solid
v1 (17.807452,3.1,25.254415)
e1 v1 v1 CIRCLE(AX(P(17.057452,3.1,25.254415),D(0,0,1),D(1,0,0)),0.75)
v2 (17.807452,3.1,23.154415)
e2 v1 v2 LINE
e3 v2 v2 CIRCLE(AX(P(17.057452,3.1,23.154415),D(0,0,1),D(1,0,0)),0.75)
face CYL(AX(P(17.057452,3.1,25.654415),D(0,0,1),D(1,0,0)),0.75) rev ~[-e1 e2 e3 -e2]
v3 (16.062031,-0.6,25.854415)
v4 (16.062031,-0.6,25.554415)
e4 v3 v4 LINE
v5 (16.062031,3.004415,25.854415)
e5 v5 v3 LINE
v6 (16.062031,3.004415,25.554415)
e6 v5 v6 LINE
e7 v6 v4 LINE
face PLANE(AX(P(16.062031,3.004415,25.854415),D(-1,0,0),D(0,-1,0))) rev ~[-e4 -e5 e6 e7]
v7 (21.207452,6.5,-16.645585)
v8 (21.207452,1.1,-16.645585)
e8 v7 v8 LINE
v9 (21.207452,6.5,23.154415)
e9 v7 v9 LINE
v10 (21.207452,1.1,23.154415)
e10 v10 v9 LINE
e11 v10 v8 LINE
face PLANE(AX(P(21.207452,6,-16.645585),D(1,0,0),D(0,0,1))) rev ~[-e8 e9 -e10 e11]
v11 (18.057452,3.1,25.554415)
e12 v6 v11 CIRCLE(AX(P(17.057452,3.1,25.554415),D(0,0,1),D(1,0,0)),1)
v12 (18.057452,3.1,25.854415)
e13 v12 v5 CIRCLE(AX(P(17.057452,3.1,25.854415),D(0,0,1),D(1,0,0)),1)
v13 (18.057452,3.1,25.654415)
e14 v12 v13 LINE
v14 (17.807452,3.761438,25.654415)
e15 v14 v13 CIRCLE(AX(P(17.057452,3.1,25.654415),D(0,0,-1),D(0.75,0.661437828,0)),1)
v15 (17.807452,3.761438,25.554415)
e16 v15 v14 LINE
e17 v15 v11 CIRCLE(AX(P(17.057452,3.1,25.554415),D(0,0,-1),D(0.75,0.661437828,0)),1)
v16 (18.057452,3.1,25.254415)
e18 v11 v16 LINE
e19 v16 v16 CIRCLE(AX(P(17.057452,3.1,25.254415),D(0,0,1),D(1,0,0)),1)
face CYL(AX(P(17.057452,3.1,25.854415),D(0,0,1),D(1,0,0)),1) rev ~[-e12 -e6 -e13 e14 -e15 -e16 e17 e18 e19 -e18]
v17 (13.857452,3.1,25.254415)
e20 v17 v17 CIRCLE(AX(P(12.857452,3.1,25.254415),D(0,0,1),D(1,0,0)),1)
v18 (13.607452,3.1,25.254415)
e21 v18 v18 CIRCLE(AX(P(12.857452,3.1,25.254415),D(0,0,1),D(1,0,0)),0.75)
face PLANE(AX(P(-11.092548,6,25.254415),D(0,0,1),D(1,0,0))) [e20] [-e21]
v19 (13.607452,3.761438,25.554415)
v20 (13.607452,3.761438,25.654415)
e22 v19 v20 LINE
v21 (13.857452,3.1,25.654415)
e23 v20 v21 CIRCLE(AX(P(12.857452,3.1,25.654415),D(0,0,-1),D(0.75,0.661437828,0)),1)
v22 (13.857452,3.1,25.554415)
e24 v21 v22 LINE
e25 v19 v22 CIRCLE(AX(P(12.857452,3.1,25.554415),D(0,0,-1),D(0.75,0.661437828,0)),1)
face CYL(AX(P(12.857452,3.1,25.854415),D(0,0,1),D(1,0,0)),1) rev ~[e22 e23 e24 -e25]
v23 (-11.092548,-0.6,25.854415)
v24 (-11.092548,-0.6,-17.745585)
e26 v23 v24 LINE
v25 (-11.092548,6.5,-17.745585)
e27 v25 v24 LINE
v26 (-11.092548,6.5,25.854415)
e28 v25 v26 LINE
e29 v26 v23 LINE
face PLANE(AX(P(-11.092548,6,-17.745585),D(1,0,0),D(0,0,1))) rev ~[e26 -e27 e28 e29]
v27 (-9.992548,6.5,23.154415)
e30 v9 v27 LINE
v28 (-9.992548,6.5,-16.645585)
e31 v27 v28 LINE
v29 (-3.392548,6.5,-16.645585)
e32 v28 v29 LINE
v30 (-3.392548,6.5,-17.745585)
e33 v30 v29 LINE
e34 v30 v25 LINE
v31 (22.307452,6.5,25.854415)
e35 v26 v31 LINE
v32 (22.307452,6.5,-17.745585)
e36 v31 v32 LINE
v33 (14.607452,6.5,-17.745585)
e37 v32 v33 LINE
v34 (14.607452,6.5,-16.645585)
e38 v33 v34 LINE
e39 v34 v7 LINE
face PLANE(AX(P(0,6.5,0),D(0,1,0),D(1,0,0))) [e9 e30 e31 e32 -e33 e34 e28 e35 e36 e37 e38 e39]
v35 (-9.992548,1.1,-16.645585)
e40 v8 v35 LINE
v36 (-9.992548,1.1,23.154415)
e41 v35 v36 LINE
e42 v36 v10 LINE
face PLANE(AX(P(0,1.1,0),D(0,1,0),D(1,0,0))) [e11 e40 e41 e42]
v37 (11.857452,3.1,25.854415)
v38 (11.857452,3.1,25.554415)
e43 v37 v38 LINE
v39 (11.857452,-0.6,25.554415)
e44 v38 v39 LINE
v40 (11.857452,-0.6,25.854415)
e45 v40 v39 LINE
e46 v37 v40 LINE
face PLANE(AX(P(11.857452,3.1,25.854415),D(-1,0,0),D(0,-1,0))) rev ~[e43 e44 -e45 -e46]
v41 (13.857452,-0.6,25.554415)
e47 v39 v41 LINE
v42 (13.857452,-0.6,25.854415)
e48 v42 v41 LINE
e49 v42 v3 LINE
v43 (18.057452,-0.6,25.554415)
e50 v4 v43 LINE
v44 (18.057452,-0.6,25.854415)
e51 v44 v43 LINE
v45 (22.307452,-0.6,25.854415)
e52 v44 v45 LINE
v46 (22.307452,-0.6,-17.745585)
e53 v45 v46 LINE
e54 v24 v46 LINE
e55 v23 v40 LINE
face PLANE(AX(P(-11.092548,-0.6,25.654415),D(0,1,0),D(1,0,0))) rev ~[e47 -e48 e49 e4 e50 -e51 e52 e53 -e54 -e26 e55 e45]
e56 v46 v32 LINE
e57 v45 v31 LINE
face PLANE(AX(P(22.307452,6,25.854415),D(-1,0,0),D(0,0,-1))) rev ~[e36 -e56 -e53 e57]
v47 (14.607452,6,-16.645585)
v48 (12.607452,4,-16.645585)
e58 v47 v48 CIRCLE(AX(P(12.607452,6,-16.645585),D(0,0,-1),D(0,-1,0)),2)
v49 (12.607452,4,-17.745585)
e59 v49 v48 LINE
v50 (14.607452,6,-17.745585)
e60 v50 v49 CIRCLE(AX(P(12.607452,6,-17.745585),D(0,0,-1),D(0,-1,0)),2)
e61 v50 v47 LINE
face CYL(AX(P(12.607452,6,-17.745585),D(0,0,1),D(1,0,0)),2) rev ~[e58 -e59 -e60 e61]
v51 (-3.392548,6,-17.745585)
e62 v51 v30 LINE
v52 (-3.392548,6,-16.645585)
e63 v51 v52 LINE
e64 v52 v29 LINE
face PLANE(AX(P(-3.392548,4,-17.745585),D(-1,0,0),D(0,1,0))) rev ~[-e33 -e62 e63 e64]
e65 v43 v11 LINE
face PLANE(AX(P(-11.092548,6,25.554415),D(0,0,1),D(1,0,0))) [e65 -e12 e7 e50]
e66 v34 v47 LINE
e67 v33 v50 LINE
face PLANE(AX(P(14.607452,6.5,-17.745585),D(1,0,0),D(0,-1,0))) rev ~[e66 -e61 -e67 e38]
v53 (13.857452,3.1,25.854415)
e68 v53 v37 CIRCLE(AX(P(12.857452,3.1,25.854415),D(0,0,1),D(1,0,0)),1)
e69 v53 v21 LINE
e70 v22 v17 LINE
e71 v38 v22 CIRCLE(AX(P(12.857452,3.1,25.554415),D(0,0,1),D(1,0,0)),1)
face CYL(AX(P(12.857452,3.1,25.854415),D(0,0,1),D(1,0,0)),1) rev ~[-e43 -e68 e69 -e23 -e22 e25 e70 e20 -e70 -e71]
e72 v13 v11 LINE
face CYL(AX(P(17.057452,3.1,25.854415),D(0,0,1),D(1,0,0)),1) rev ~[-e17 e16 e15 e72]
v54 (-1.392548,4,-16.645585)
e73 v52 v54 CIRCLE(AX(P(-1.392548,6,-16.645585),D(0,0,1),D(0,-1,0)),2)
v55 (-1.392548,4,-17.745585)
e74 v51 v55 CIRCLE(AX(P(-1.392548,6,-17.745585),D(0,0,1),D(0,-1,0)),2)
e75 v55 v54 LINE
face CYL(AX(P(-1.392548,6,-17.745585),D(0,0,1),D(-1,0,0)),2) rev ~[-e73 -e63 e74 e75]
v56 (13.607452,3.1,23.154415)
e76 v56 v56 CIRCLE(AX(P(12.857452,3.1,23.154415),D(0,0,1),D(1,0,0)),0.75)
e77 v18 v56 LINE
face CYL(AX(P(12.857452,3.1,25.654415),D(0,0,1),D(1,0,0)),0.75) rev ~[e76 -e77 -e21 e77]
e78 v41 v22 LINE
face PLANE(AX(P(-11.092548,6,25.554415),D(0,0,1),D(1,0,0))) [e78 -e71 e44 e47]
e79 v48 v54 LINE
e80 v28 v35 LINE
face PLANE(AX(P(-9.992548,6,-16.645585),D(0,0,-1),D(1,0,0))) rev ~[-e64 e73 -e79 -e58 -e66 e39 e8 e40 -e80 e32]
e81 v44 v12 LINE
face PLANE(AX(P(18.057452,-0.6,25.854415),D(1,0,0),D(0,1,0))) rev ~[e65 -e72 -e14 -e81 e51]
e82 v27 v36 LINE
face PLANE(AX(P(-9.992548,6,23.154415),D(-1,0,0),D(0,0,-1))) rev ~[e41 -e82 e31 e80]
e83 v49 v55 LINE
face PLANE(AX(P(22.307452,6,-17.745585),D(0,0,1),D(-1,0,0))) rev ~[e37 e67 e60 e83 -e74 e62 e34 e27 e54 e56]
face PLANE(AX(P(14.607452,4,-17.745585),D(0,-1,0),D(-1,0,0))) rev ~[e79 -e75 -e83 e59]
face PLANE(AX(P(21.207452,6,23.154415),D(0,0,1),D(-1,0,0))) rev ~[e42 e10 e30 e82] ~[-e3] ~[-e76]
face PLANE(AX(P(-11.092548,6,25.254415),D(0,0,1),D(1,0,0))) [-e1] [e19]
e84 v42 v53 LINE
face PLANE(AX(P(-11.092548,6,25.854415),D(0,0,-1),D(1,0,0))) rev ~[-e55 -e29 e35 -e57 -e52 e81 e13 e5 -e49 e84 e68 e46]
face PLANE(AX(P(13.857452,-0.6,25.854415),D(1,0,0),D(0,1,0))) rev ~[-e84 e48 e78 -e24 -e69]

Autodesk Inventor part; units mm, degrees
ref_plane "YZ Plane" through (0, 0, 0) normal (1, 0, 0) x (0, 1, 0)
ref_plane "XZ Plane" through (0, 0, 0) normal (0, 1, 0) x (-1, 0, 0)
ref_plane "XY Plane" through (0, 0, 0) normal (0, 0, 1) x (1, 0, 0)
sketch "Sketch2" plane through (0, 0, 0) normal (0, 1, 0) x (-1, 0, 0)
  line L0 (11.092548, -17.745585) -> (-22.307452, -17.745585)
  line L1 (-22.307452, -17.745585) -> (-22.307452, 24.254415)
  line L2 (-22.307452, 24.254415) -> (11.092548, 24.254415)
  line L3 (11.092548, 24.254415) -> (11.092548, -17.745585)
  point P0 (0, 0)
  dimension "d2" = 42
  dimension "d3" = 33.4
sketch "Sketch2 outline for Extrusion1" plane through (0, 0, 0) normal (0, 1, 0) x (-1, 0, 0)
  line L0 (11.092548, -17.745585) -> (11.092548, 24.254415)
  line L1 (-22.307452, -17.745585) -> (11.092548, -17.745585)
  line L2 (-22.307452, 24.254415) -> (-22.307452, -17.745585)
  line L3 (11.092548, 24.254415) -> (-22.307452, 24.254415)
extrude "Extrusion1" add sketch "Sketch2 outline for Extrusion1" along normal blind 6
sketch "Sketch3" plane through (0, 6, 0) normal (0, 1, 0) x (1, 0, 0)
  line L0 (-9.992548, 16.645585) -> (21.207452, 16.645585)
  line L1 (21.207452, 16.645585) -> (21.207452, -23.154415)
  line L2 (21.207452, -23.154415) -> (-9.992548, -23.154415)
  line L3 (-9.992548, -23.154415) -> (-9.992548, 16.645585)
  line L4 (22.307452, 17.745585) -> (-11.092548, 17.745585)
  line L5 (-11.092548, 17.745585) -> (-11.092548, -24.254415)
  line L6 (22.307452, -24.254415) -> (22.307452, 17.745585)
  line L7 (-11.092548, -24.254415) -> (22.307452, -24.254415)
  point P0 (0, 0)
  dimension "d6" = 1.1
  dimension "d7" = 1.1
  dimension "d8" = 1.1
  dimension "d9" = 1.1
  dimension "d10" = 39.8
sketch "Sketch3 outline for Extrusion2" plane through (0, 6, 0) normal (0, 1, 0) x (1, 0, 0)
  line L0 (-9.992548, 16.645585) -> (-9.992548, -23.154415)
  line L1 (21.207452, 16.645585) -> (-9.992548, 16.645585)
  line L2 (21.207452, -23.154415) -> (21.207452, 16.645585)
  line L3 (-9.992548, -23.154415) -> (21.207452, -23.154415)
extrude "Extrusion2" cut sketch "Sketch3 outline for Extrusion2" against normal blind 4.9
sketch "Sketch4" plane through (0, 0, 0) normal (0, -1, 0) x (1, 0, 0)
  line L0 (22.307452, -17.745585) -> (-11.092548, -17.745585)
  line L1 (-11.092548, -17.745585) -> (-11.092548, 24.254415)
  line L2 (22.307452, -17.745585) -> (-11.092548, -17.745585)
  line L3 (-11.092548, -17.745585) -> (-11.092548, 24.254415)
  line L4 (-11.092548, 24.254415) -> (22.307452, 24.254415)
  line L5 (22.307452, 24.254415) -> (22.307452, -17.745585)
  point P0 (0, 0)
sketch "Sketch4 outline for Extrusion3" plane through (0, 0, 0) normal (0, -1, 0) x (1, 0, 0)
  line L0 (22.307452, -17.745585) -> (22.307452, 24.254415)
  line L1 (-11.092548, -17.745585) -> (22.307452, -17.745585)
  line L2 (-11.092548, 24.254415) -> (-11.092548, -17.745585)
  line L3 (22.307452, 24.254415) -> (-11.092548, 24.254415)
extrude "Extrusion3" add sketch "Sketch4 outline for Extrusion3" along normal blind 0.6
sketch "Sketch5" plane through (-11.092548, 6, 24.254415) normal (0, 0, 1) x (1, 0, 0)
  line L0 (33.4, -6.6) -> (33.4, 0) projected
  line L1 (33.4, -6.6) -> (0, -6.6)
  line L2 (0, -6.6) -> (0, -2.5)
  line L3 (0, -2.5) -> (33.4, -2.5)
  line L4 (33.4, -2.5) -> (33.4, -6.6)
  point P0 (11.092548, -6)
  point P1 (33.4, -2.5)
sketch "Sketch5 outline for Extrusion4" plane through (-11.092548, 6, 24.254415) normal (0, 0, 1) x (1, 0, 0)
  line L0 (33.4, -2.5) -> (0, -2.5)
  line L1 (33.4, -6.6) -> (33.4, -2.5)
  line L2 (0, -6.6) -> (33.4, -6.6)
  line L3 (0, -2.5) -> (0, -6.6)
extrude "Extrusion4" add sketch "Sketch5 outline for Extrusion4" along normal blind 3
sketch "Sketch6" plane through (21.207452, 6, 23.154415) normal (0, 0, -1) x (-1, 0, 0)
  line L0 (3.6, -0.9) -> (4.9, -0.9)
  line L1 (4.9, -0.9) -> (4.9, -3.9)
  line L2 (4.9, -3.9) -> (3.6, -3.9)
  line L3 (3.6, -3.9) -> (3.6, -0.9)
  line L4 (0, -4.9) -> (31.2, -4.9) projected
  line L5 (5.6, -0.9) -> (6.9, -0.9)
  line L6 (6.9, -0.9) -> (6.9, -3.9)
  line L7 (6.9, -3.9) -> (5.6, -3.9)
  line L8 (5.6, -3.9) -> (5.6, -0.9)
  line L9 (7.6, -0.9) -> (8.9, -0.9)
  line L10 (8.9, -0.9) -> (8.9, -3.9)
  line L11 (8.9, -3.9) -> (7.6, -3.9)
  line L12 (7.6, -3.9) -> (7.6, -0.9)
  point P0 (21.207452, -6)
  point P1 (0, 0)
  dimension "d17" = 3
  dimension "d18" = 1.3
  dimension "d19" = 3.6
  dimension "d20" = 1
  dimension "d23" = 3
  dimension "d24" = 1.3
  dimension "d25" = 3
  dimension "d26" = 1.3
  dimension "d27" = 1
  dimension "d28" = 1
  dimension "d29" = 0.7
  dimension "d30" = 0.7
sketch "Sketch7" plane through (-11.092548, 3.5, 24.254415) normal (0, 1, 0) x (1, 0, 0)
  line L0 (0, 0) -> (33.4, 0) projected
  line L1 (0, 42) -> (0, -3) projected
  line L2 (33.4, 0) -> (0, 0)
  line L3 (0, 0) -> (0, -3)
  line L4 (0, -3) -> (33.4, -3)
  line L5 (33.4, -3) -> (33.4, 0)
  point P0 (11.092548, 24.254415)
sketch "Sketch7 outline for Extrusion5" plane through (-11.092548, 3.5, 24.254415) normal (0, 1, 0) x (1, 0, 0)
  line L0 (33.4, -3) -> (33.4, 0)
  line L1 (0, -3) -> (33.4, -3)
  line L2 (0, 0) -> (0, -3)
  line L3 (33.4, 0) -> (0, 0)
extrude "Extrusion5" add sketch "Sketch7 outline for Extrusion5" along normal blind 2.5
sketch "Sketch6 outline for Extrusion6" plane through (21.207452, 6, 23.154415) normal (0, 0, -1) x (-1, 0, 0)
  line L0 (7.6, -0.9) -> (7.6, -3.9)
  line L1 (8.9, -0.9) -> (7.6, -0.9)
  line L2 (8.9, -3.9) -> (8.9, -0.9)
  line L3 (7.6, -3.9) -> (8.9, -3.9)
  line L4 (5.6, -0.9) -> (5.6, -3.9)
  line L5 (6.9, -0.9) -> (5.6, -0.9)
  line L6 (6.9, -3.9) -> (6.9, -0.9)
  line L7 (5.6, -3.9) -> (6.9, -3.9)
  line L8 (3.6, -0.9) -> (3.6, -3.9)
  line L9 (4.9, -0.9) -> (3.6, -0.9)
  line L10 (4.9, -3.9) -> (4.9, -0.9)
  line L11 (3.6, -3.9) -> (4.9, -3.9)
extrude "Extrusion6" cut sketch "Sketch6 outline for Extrusion6" against normal through all
sketch "Sketch8" plane through (0, 6, 0) normal (0, 1, 0) x (1, 0, 0)
  point P0 (0, 0)
sketch "Sketch9" plane through (16.307452, 2.1, 23.154415) normal (0, 1, 0) x (1, 0, 0)
  line L0 (1.3, 0) -> (1.3, -4.1)
  line L1 (0, 0) -> (0, -4.1)
  line L2 (1.3, -2.3) -> (0, -2.3)
  line L3 (0, -2.3) -> (0, -2)
  line L4 (0, -2) -> (1.3, -2)
  line L5 (1.3, -2) -> (1.3, -2.3)
  line L6 (0, 0) -> (1.3, 0)
  line L7 (-0.7, -2.311138) -> (-2, -2.311138)
  line L8 (-2, -2.311138) -> (-2, -2.011138)
  line L9 (-2, -2.011138) -> (-0.7, -2.011138)
  line L10 (-0.7, -2.011138) -> (-0.7, -2.311138)
  line L11 (-0.7, 0) -> (-0.7, -4.1)
  line L12 (-2, 0) -> (-0.7, 0)
  line L13 (-2.7, -2.3) -> (-4, -2.3)
  line L14 (-4, -2) -> (-2.7, -2)
  line L15 (-2.7, -2) -> (-2.7, -2.3)
  line L16 (-4, -2.3) -> (-4, -2)
  line L17 (-4, 0) -> (-2.7, 0)
  point P0 (-16.307452, 23.154415)
  point P1 (1.3, -2)
  point P2 (0, -2.3)
  dimension "d33" = 0.3
  dimension "d34" = 2
  dimension "d35" = 0.3
  dimension "d36" = 1.3
  dimension "d37" = 0
  dimension "d38" = 2.01114
  dimension "d39" = 0.3
  dimension "d40" = 1.3
  dimension "d41" = 0
  dimension "d42" = 2
sketch "Sketch9 outline for Extrusion7" plane through (16.307452, 2.1, 23.154415) normal (0, 1, 0) x (1, 0, 0)
  line L0 (-4, -2) -> (-4, -2.3)
  line L1 (-2.7, -2) -> (-4, -2)
  line L2 (-2.7, -2.3) -> (-2.7, -2)
  line L3 (-4, -2.3) -> (-2.7, -2.3)
  line L4 (-2, -2.011138) -> (-2, -2.311138)
  line L5 (-0.7, -2.011138) -> (-2, -2.011138)
  line L6 (-0.7, -2.311138) -> (-0.7, -2.011138)
  line L7 (-2, -2.311138) -> (-0.7, -2.311138)
  line L8 (1.3, -2) -> (0, -2)
  line L9 (1.3, -2.3) -> (1.3, -2)
  line L10 (0, -2.3) -> (1.3, -2.3)
  line L11 (0, -2) -> (0, -2.3)
extrude "Extrusion7" add sketch "Sketch9 outline for Extrusion7" along normal up to surface (3.9 mm away)
sketch "Sketch10" plane through (0, 6, 0) normal (0, 1, 0) x (1, 0, 0)
  line L0 (17.607452, -25.654415) -> (16.307452, -25.654415)
  line L1 (16.307452, -25.654415) -> (16.307452, -24.654415)
  line L2 (16.307452, -24.654415) -> (17.607452, -24.654415)
  line L3 (17.607452, -24.654415) -> (17.607452, -25.654415)
  line L4 (21.207452, -23.154415) -> (-9.992548, -23.154415)
  line L5 (13.607452, -25.654415) -> (12.307452, -25.654415)
  line L6 (12.307452, -25.654415) -> (12.307452, -24.654415)
  line L7 (12.307452, -24.654415) -> (13.607452, -24.654415)
  line L8 (13.607452, -24.654415) -> (13.607452, -25.654415)
  line L9 (15.607452, -25.654415) -> (14.307452, -25.654415)
  line L10 (14.307452, -25.654415) -> (14.307452, -24.654415)
  line L11 (14.307452, -24.654415) -> (15.607452, -24.654415)
  line L12 (15.607452, -24.654415) -> (15.607452, -25.654415)
  line L13 (13.607452, -25.454415) -> (13.607452, -27.254415)
  point P0 (0, 0)
  point P1 (17.607452, -23.154415)
  point P2 (15.607452, -27.254415)
  dimension "d45" = 1.3
  dimension "d46" = 1
  dimension "d47" = 0
  dimension "d48" = 1.5
  dimension "d49" = 1.3
  dimension "d50" = 1
  dimension "d51" = 1.3
  dimension "d52" = 1
  dimension "d53" = 1.5
  dimension "d54" = 1.5
  dimension "d55" = 0
  dimension "d56" = 0
sketch "Sketch10 outline for Extrusion8" plane through (0, 6, 0) normal (0, 1, 0) x (1, 0, 0)
  line L0 (13.607452, -24.654415) -> (12.307452, -24.654415)
  line L1 (13.607452, -25.654415) -> (13.607452, -24.654415)
  line L2 (12.307452, -25.654415) -> (13.607452, -25.654415)
  line L3 (12.307452, -24.654415) -> (12.307452, -25.654415)
  line L4 (15.607452, -25.654415) -> (15.607452, -24.654415)
  line L5 (14.307452, -25.654415) -> (15.607452, -25.654415)
  line L6 (14.307452, -24.654415) -> (14.307452, -25.654415)
  line L7 (15.607452, -24.654415) -> (14.307452, -24.654415)
  line L8 (17.607452, -25.654415) -> (17.607452, -24.654415)
  line L9 (16.307452, -25.654415) -> (17.607452, -25.654415)
  line L10 (16.307452, -24.654415) -> (16.307452, -25.654415)
  line L11 (17.607452, -24.654415) -> (16.307452, -24.654415)
extrude "Extrusion8" cut sketch "Sketch10 outline for Extrusion8" against normal blind 1.5
sketch "Sketch11" plane through (-11.092548, 6, 27.254415) normal (0, 0, 1) x (1, 0, 0)
  line L0 (28.7, 0) -> (28.7, -0.9) projected
  line L1 (27.4, -3.9) -> (27.4, -0.9) projected
  line L2 (28.7, -0.9) -> (27.4, -0.9)
  line L3 (27.4, -0.9) -> (27.4, -1.7)
  line L4 (27.4, -1.7) -> (28.7, -1.7)
  line L5 (28.7, -1.7) -> (28.7, -0.9)
  line L6 (26.7, 0) -> (26.7, -0.9) projected
  line L7 (25.4, -3.9) -> (25.4, -1.5) projected
  line L8 (26.7, -0.9) -> (25.4, -0.9)
  line L9 (25.4, -0.9) -> (25.4, -1.7)
  line L10 (25.4, -1.7) -> (26.7, -1.7)
  line L11 (26.7, -1.7) -> (26.7, -0.9)
  line L12 (24.7, -0.9) -> (24.7, -3.9) projected
  line L13 (23.4, -3.9) -> (23.4, -0.9) projected
  line L14 (24.7, -0.9) -> (23.4, -0.9)
  line L15 (23.4, -0.9) -> (23.4, -1.7)
  line L16 (23.4, -1.7) -> (24.7, -1.7)
  line L17 (24.7, -1.7) -> (24.7, -0.9)
  point P0 (11.092548, -6)
  point P1 (24.7, -1.7)
  dimension "d59" = 0.8
sketch "Sketch11 outline for Extrusion9" plane through (-11.092548, 6, 27.254415) normal (0, 0, 1) x (1, 0, 0)
  line L0 (24.7, -0.9) -> (23.4, -0.9)
  line L1 (24.7, -1.7) -> (24.7, -0.9)
  line L2 (23.4, -1.7) -> (24.7, -1.7)
  line L3 (23.4, -0.9) -> (23.4, -1.7)
  line L4 (26.7, -0.9) -> (25.4, -0.9)
  line L5 (25.4, -0.9) -> (25.4, -1.7)
  line L6 (25.4, -1.7) -> (26.7, -1.7)
  line L7 (26.7, -1.7) -> (26.7, -0.9)
  line L8 (28.7, -0.9) -> (27.4, -0.9)
  line L9 (28.7, -1.7) -> (28.7, -0.9)
  line L10 (27.4, -1.7) -> (28.7, -1.7)
  line L11 (27.4, -0.9) -> (27.4, -1.7)
extrude "Extrusion9" add sketch "Sketch11 outline for Extrusion9" against normal up to surface (1.6 mm away)
sketch "Sketch12" plane through (0, 6, 0) normal (0, 1, 0) x (1, 0, 0)
  line L0 (-11.092548, -27.254415) -> (22.307452, -27.254415)
  line L1 (-11.092548, 17.745585) -> (-11.092548, -27.254415)
  line L2 (22.307452, -27.254415) -> (-11.092548, -27.254415)
  line L3 (-11.092548, -27.254415) -> (-11.092548, -26.754415)
  line L4 (-11.092548, -26.754415) -> (22.307452, -26.754415)
  line L5 (22.307452, -26.754415) -> (22.307452, -27.254415)
  line L6 (17.607452, -25.654415) -> (16.307452, -25.654415)
  point P0 (0, 0)
  dimension "d62" = 1.1
sketch "Sketch12 outline for Extrusion10" plane through (0, 6, 0) normal (0, 1, 0) x (1, 0, 0)
  line L0 (22.307452, -27.254415) -> (22.307452, -26.754415)
  line L1 (-11.092548, -27.254415) -> (22.307452, -27.254415)
  line L2 (-11.092548, -26.754415) -> (-11.092548, -27.254415)
  line L3 (22.307452, -26.754415) -> (-11.092548, -26.754415)
extrude "Extrusion10" cut sketch "Sketch12 outline for Extrusion10" against normal through all
sketch "Sketch13" plane through (-11.092548, 6, 26.754415) normal (0, 0, 1) x (1, 0, 0)
  line L0 (23.4, -1.7) -> (23.4, -3.9) projected
  line L1 (24.7, -3.9) -> (24.7, -1.7) projected
  line L2 (23.4, -1.7) -> (24.7, -1.7)
  line L3 (24.7, -1.7) -> (24.7, -3.9)
  line L4 (24.7, -3.9) -> (23.4, -3.9)
  line L5 (23.4, -3.9) -> (23.4, -1.7)
  line L6 (26.7, -1.7) -> (25.4, -1.7) projected
  line L7 (25.4, -3.9) -> (26.7, -3.9) projected
  line L8 (25.4, -1.7) -> (26.7, -1.7)
  line L9 (26.7, -1.7) -> (26.7, -3.9)
  line L10 (26.7, -3.9) -> (25.4, -3.9)
  line L11 (25.4, -3.9) -> (25.4, -1.7)
  line L12 (27.4, -3.9) -> (27.4, -1.5) projected
  line L13 (28.7, -3.9) -> (28.7, -0.9) projected
  line L14 (27.4, -1.7) -> (28.7, -1.7)
  line L15 (28.7, -1.7) -> (28.7, -3.9)
  line L16 (28.7, -3.9) -> (27.4, -3.9)
  line L17 (27.4, -3.9) -> (27.4, -1.7)
  point P0 (11.092548, -6)
  point P1 (28.7, -1.7)
sketch "Sketch13 outline for Extrusion11" plane through (-11.092548, 6, 26.754415) normal (0, 0, 1) x (1, 0, 0)
  line L0 (27.4, -3.9) -> (28.7, -3.9)
  line L1 (27.4, -1.7) -> (27.4, -3.9)
  line L2 (28.7, -1.7) -> (27.4, -1.7)
  line L3 (28.7, -3.9) -> (28.7, -1.7)
  line L4 (26.7, -3.9) -> (26.7, -1.7)
  line L5 (25.4, -3.9) -> (26.7, -3.9)
  line L6 (25.4, -1.7) -> (25.4, -3.9)
  line L7 (26.7, -1.7) -> (25.4, -1.7)
  line L8 (24.7, -1.7) -> (23.4, -1.7)
  line L9 (24.7, -3.9) -> (24.7, -1.7)
  line L10 (23.4, -3.9) -> (24.7, -3.9)
  line L11 (23.4, -1.7) -> (23.4, -3.9)
extrude "Extrusion11" cut sketch "Sketch13 outline for Extrusion11" against normal through all
sketch "Sketch14" plane through (0, -0.6, 0) normal (0, -1, 0) x (1, 0, 0)
  point P0 (0, 0)
sketch "Sketch15" plane through (22.307452, 6, -17.745585) normal (0, 0, -1) x (-1, 0, 0)
  line L0 (6, -3.9) -> (6, -1.7) projected
  line L1 (4.7, -3.9) -> (6, -3.9) projected
  line L2 (6, -1.7) -> (4.7, -1.7)
  line L3 (4.7, -1.7) -> (4.7, -3.9)
  line L4 (4.7, -3.9) -> (6, -3.9)
  line L5 (6, -3.9) -> (6, -1.7)
  line L6 (6.7, -1.7) -> (8, -1.7) projected
  line L7 (6.7, -1.7) -> (6.7, -3.9) projected
  line L8 (8, -1.7) -> (6.7, -1.7)
  line L9 (6.7, -1.7) -> (6.7, -3.9)
  line L10 (6.7, -3.9) -> (8, -3.9)
  line L11 (8, -3.9) -> (8, -1.7)
  line L12 (10, -1.7) -> (10, -3.9) projected
  line L13 (8.7, -3.9) -> (10, -3.9) projected
  line L14 (10, -1.7) -> (8.7, -1.7)
  line L15 (8.7, -1.7) -> (8.7, -3.9)
  line L16 (8.7, -3.9) -> (10, -3.9)
  line L17 (10, -3.9) -> (10, -1.7)
  point P0 (22.307452, -6)
sketch "Sketch15 outline for Extrusion12" plane through (22.307452, 6, -17.745585) normal (0, 0, -1) x (-1, 0, 0)
  line L0 (8.7, -1.7) -> (8.7, -3.9)
  line L1 (10, -1.7) -> (8.7, -1.7)
  line L2 (10, -3.9) -> (10, -1.7)
  line L3 (8.7, -3.9) -> (10, -3.9)
  line L4 (8, -3.9) -> (8, -1.7)
  line L5 (6.7, -3.9) -> (8, -3.9)
  line L6 (6.7, -1.7) -> (6.7, -3.9)
  line L7 (8, -1.7) -> (6.7, -1.7)
  line L8 (4.7, -1.7) -> (4.7, -3.9)
  line L9 (6, -1.7) -> (4.7, -1.7)
  line L10 (6, -3.9) -> (6, -1.7)
  line L11 (4.7, -3.9) -> (6, -3.9)
extrude "Extrusion12" add sketch "Sketch15 outline for Extrusion12" against normal blind 1.1
sketch "Sketch16" plane through (0, 6, 0) normal (0, 1, 0) x (1, 0, 0)
  line L0 (17.607452, -25.654415) -> (16.307452, -25.654415)
  line L1 (17.607452, -24.654415) -> (16.307452, -24.654415)
  line L2 (16.307452, -25.654415) -> (17.607452, -25.654415)
  line L3 (17.607452, -25.654415) -> (17.607452, -24.654415)
  line L4 (17.607452, -24.654415) -> (16.307452, -24.654415)
  line L5 (16.307452, -24.654415) -> (16.307452, -25.654415)
  line L6 (15.607452, -24.654415) -> (14.307452, -24.654415)
  line L7 (14.307452, -25.654415) -> (15.607452, -25.654415)
  line L8 (15.607452, -25.654415) -> (15.607452, -24.654415)
  line L9 (15.607452, -24.654415) -> (14.307452, -24.654415)
  line L10 (14.307452, -24.654415) -> (14.307452, -25.654415)
  line L11 (13.607452, -25.654415) -> (12.307452, -25.654415)
  line L12 (13.607452, -24.654415) -> (13.607452, -25.654415)
  line L13 (12.307452, -25.654415) -> (13.607452, -25.654415)
  line L14 (13.607452, -25.654415) -> (13.607452, -24.654415)
  line L15 (13.607452, -24.654415) -> (12.307452, -24.654415)
  line L16 (12.307452, -24.654415) -> (12.307452, -25.654415)
  point P0 (0, 0)
sketch "Sketch16 outline for Extrusion13" plane through (0, 6, 0) normal (0, 1, 0) x (1, 0, 0)
  line L0 (12.307452, -24.654415) -> (12.307452, -25.654415)
  line L1 (13.607452, -24.654415) -> (12.307452, -24.654415)
  line L2 (13.607452, -25.654415) -> (13.607452, -24.654415)
  line L3 (12.307452, -25.654415) -> (13.607452, -25.654415)
  line L4 (15.607452, -25.654415) -> (15.607452, -24.654415)
  line L5 (14.307452, -25.654415) -> (15.607452, -25.654415)
  line L6 (14.307452, -24.654415) -> (14.307452, -25.654415)
  line L7 (15.607452, -24.654415) -> (14.307452, -24.654415)
  line L8 (17.607452, -25.654415) -> (17.607452, -24.654415)
  line L9 (16.307452, -25.654415) -> (17.607452, -25.654415)
  line L10 (16.307452, -24.654415) -> (16.307452, -25.654415)
  line L11 (17.607452, -24.654415) -> (16.307452, -24.654415)
extrude "Extrusion13" cut sketch "Sketch16 outline for Extrusion13" against normal up to surface (3.9 mm away)
sketch "Sketch17" plane through (0, 6, 0) normal (0, 1, 0) x (1, 0, 0)
  line L0 (22.307452, -26.754415) -> (22.307452, 17.745585)
  line L1 (-11.092548, 17.745585) -> (-11.092548, -26.754415)
  line L2 (22.307452, -26.754415) -> (-11.092548, -26.754415)
  line L3 (-11.092548, -26.754415) -> (-11.092548, -25.654415)
  line L4 (-11.092548, -25.654415) -> (22.307452, -25.654415)
  line L5 (22.307452, -25.654415) -> (22.307452, -26.754415)
  point P0 (0, 0)
  dimension "d71" = 1.1
sketch "Sketch17 outline for Extrusion14" plane through (0, 6, 0) normal (0, 1, 0) x (1, 0, 0)
  line L0 (-11.092548, -26.754415) -> (22.307452, -26.754415)
  line L1 (-11.092548, -25.654415) -> (-11.092548, -26.754415)
  line L2 (22.307452, -25.654415) -> (-11.092548, -25.654415)
  line L3 (22.307452, -26.754415) -> (22.307452, -25.654415)
extrude "Extrusion14" cut sketch "Sketch17 outline for Extrusion14" against normal through all
sketch "Sketch18" plane through (-11.092548, 6, 25.654415) normal (0, 0, 1) x (1, 0, 0)
  line L0 (27.4, -3.9) -> (28.7, -3.9) projected
  line L1 (32.3, 0) -> (1.1, 0) projected
  line L2 (28.7, -3.9) -> (28.9, -3.9)
  line L3 (28.9, -3.9) -> (28.9, 0)
  line L4 (28.9, 0) -> (28.7, 0)
  line L5 (28.7, 0) -> (28.7, -3.9)
  line L6 (23.4, -3.9) -> (24.7, -3.9) projected
  line L7 (23.4, -3.9) -> (23.2, -3.9)
  line L8 (23.2, -3.9) -> (23.2, 0)
  line L9 (23.2, 0) -> (23.4, 0)
  line L10 (23.4, 0) -> (23.4, -3.9)
  point P0 (11.092548, -6)
  point P1 (23.2, 0)
  dimension "d74" = 0.2
  dimension "d75" = 0.2
sketch "Sketch18 outline for Extrusion15" plane through (-11.092548, 6, 25.654415) normal (0, 0, 1) x (1, 0, 0)
  line L0 (23.2, -3.9) -> (23.4, -3.9)
  line L1 (23.2, 0) -> (23.2, -3.9)
  line L2 (23.4, 0) -> (23.2, 0)
  line L3 (23.4, -3.9) -> (23.4, 0)
  line L4 (28.7, -3.9) -> (28.9, -3.9)
  line L5 (28.7, 0) -> (28.7, -3.9)
  line L6 (28.9, 0) -> (28.7, 0)
  line L7 (28.9, -3.9) -> (28.9, 0)
extrude "Extrusion15" cut sketch "Sketch18 outline for Extrusion15" against normal up to surface (1 mm away)
sketch "Sketch19" plane through (-11.092548, -0.6, 25.654415) normal (0, 0, 1) x (1, 0, 0)
  line L0 (28.7, 5.7) -> (27.4, 5.7)
  line L1 (28.9, 2.7) -> (28.9, 6.6)
  line L2 (28.7, 5.7) -> (28.9, 5.7)
  line L3 (28.9, 5.7) -> (28.9, 2.798247)
  line L4 (28.9, 2.798247) -> (28.7, 2.798247)
  line L5 (28.7, 2.798247) -> (28.7, 5.7)
  line L6 (24.7, 5.7) -> (23.4, 5.7)
  line L7 (23.2, 6.6) -> (23.2, 2.7)
  line L8 (23.4, 5.7) -> (23.2, 5.7)
  line L9 (23.2, 5.7) -> (23.2, 2.7)
  line L10 (23.2, 2.7) -> (23.4, 2.7)
  line L11 (23.4, 2.7) -> (23.4, 5.7)
  point P0 (11.092548, 0.6)
sketch "Sketch19 outline for Extrusion16" plane through (-11.092548, -0.6, 25.654415) normal (0, 0, 1) x (1, 0, 0)
  line L0 (28.7, 5.7) -> (28.7, 2.798247)
  line L1 (28.9, 5.7) -> (28.7, 5.7)
  line L2 (28.9, 2.798247) -> (28.9, 5.7)
  line L3 (28.7, 2.798247) -> (28.9, 2.798247)
  line L4 (23.4, 2.7) -> (23.4, 5.7)
  line L5 (23.2, 2.7) -> (23.4, 2.7)
  line L6 (23.2, 5.7) -> (23.2, 2.7)
  line L7 (23.4, 5.7) -> (23.2, 5.7)
extrude "Extrusion16" cut sketch "Sketch19 outline for Extrusion16" against normal up to surface (42.3 mm away)
sketch "Sketch20" plane through (17.607452, 2.1, 24.654415) normal (0, 0, 1) x (1, 0, 0)
  line L0 (0.2, 0) -> (-1.3, 0) projected
  line L1 (-1.3, 3.9) -> (-1.3, 0) projected
  line L2 (0.2, 0) -> (-1.3, 0)
  line L3 (-1.3, 0) -> (-1.3, 3.9)
  line L4 (-1.3, 3.9) -> (0.2, 3.9)
  line L5 (0.2, 3.9) -> (0.2, 0)
  point P0 (-17.607452, -2.1)
sketch "Sketch21" plane through (17.607452, 2.1, 24.654415) normal (0, 0, 1) x (1, 0, 0)
  line L0 (0, 0) -> (0, 0.098247)
  line L1 (0.2, 0) -> (-1.3, 0)
  line L2 (0, 0.098247) -> (0.2, 0.098247)
  line L3 (0.2, 0.098247) -> (0.2, 0)
  line L4 (0.2, 0) -> (0, 0)
  line L5 (0, 0) -> (0, 0.098247)
  point P0 (-17.607452, -2.1)
sketch "Sketch21 outline for Extrusion17" plane through (17.607452, 2.1, 24.654415) normal (0, 0, 1) x (1, 0, 0)
  line L0 (0.2, 0) -> (0.2, 0.098247)
  line L1 (0, 0) -> (0.2, 0)
  line L2 (0, 0.098247) -> (0, 0)
  line L3 (0.2, 0.098247) -> (0, 0.098247)
extrude "Extrusion17" cut sketch "Sketch21 outline for Extrusion17" against normal blind 2
sketch "Sketch22" plane through (0, 6, 0) normal (0, 1, 0) x (1, 0, 0)
  point P0 (0, 0)
sketch "Sketch23" plane through (-11.092548, -0.6, 25.654415) normal (0, 0, 1) x (1, 0, 0)
  circle A0 centre (28.15, 3.7) radius 1
  line L0 (28.9, 2.7) -> (27.4, 2.7)
  circle A1 centre (23.95, 3.7) radius 1
  line L1 (24.7, 2.7) -> (23.2, 2.7)
  line L2 (23.2, 2.7) -> (23.2, 6.6)
  line L3 (28.9, 6.6) -> (28.9, 2.7)
  line L4 (27.4, 5.7) -> (27.4, 2.7)
  line L5 (28.9, 2.7) -> (27.4, 2.7)
  line L6 (27.4, 2.7) -> (27.4, 3.157237)
  line L7 (27.4, 3.157237) -> (28.9, 3.157237)
  line L8 (28.9, 3.157237) -> (28.9, 2.7)
  line L9 (24.7, 2.7) -> (24.7, 5.7)
  line L10 (23.2, 5.7) -> (23.2, 2.7)
  line L11 (24.7, 2.7) -> (23.2, 2.7)
  line L12 (23.2, 2.7) -> (23.2, 3.216306)
  line L13 (23.2, 3.216306) -> (24.7, 3.216306)
  line L14 (24.7, 3.216306) -> (24.7, 2.7)
  point P0 (11.092548, 0.6)
  point P1 (24.7, 3.216306)
  point P2 (23.2, 3.216306)
  dimension "d82" = 1
  dimension "d83" = 2
  dimension "d84" = 2
  dimension "d85" = 1
  dimension "d86" = 0.75
sketch "Sketch23 outline for Extrusion18" plane through (-11.092548, -0.6, 25.654415) normal (0, 0, 1) x (1, 0, 0)
  line L0 (24.7, 3.216306) -> (23.2, 3.216306)
  line L1 (24.7, 2.7) -> (24.7, 3.216306)
  line L2 (23.2, 2.7) -> (24.7, 2.7)
  line L3 (23.2, 3.216306) -> (23.2, 2.7)
  line L4 (27.4, 3.157237) -> (27.4, 2.7)
  line L5 (28.9, 3.157237) -> (27.4, 3.157237)
  line L6 (28.9, 2.7) -> (28.9, 3.157237)
  line L7 (27.4, 2.7) -> (28.9, 2.7)
extrude "Extrusion18" add sketch "Sketch23 outline for Extrusion18" against normal blind 2.5
sketch "Sketch24" plane through (-11.092548, -0.6, 25.654415) normal (0, 0, 1) x (1, 0, 0)
  circle A0 centre (28.15, 3.7) radius 1
  circle A1 centre (23.95, 3.7) radius 1
  line L0 (27.4, 6.6) -> (27.4, 3.157237)
  line L1 (25.4, 2.7) -> (26.7, 2.7)
  line L2 (23.2, 3.216306) -> (23.2, 6.6)
  point P0 (11.092548, 0.6)
  dimension "d89" = 0.75
  dimension "d90" = 2
  dimension "d91" = 1
  dimension "d92" = 0.75
  dimension "d93" = 1
  dimension "d94" = 2
sketch "Sketch24 outline for Extrusion19" plane through (-11.092548, -0.6, 25.654415) normal (0, 0, 1) x (1, 0, 0)
  circle A0 centre (23.95, 3.7) radius 1
  circle A1 centre (28.15, 3.7) radius 1
extrude "Extrusion19" cut sketch "Sketch24 outline for Extrusion19" against normal blind 0.1
sketch "Sketch25" plane through (-11.092548, -0.6, 25.654415) normal (0, 0, 1) x (1, 0, 0)
  line L0 (28.9, 3.157237) -> (28.9, 5.7)
  line L1 (26.7, 6.6) -> (27.4, 6.6)
  line L2 (28.9, 3.157237) -> (27.4, 3.157237)
  line L3 (27.4, 3.157237) -> (27.4, 6.6)
  line L4 (27.4, 6.6) -> (28.9, 6.6)
  line L5 (28.9, 6.6) -> (28.9, 3.157237)
  line L6 (24.7, 3.216306) -> (24.7, 5.7)
  line L7 (23.2, 6.6) -> (23.2, 5.7)
  line L8 (24.7, 3.216306) -> (23.2, 3.216306)
  line L9 (23.2, 3.216306) -> (23.2, 6.6)
  line L10 (23.2, 6.6) -> (24.7, 6.6)
  line L11 (24.7, 6.6) -> (24.7, 3.216306)
  line L12 (25.4, 2.7) -> (26.7, 2.7)
  line L13 (25.4, 6.6) -> (25.4, 2.7)
  line L14 (26.7, 2.7) -> (25.4, 2.7)
  line L15 (25.4, 2.7) -> (25.4, 6.6)
  line L16 (25.4, 6.6) -> (26.7, 6.6)
  line L17 (26.7, 6.6) -> (26.7, 2.7)
  point P0 (11.092548, 0.6)
  point P1 (28.9, 5.7)
sketch "Sketch25 outline for Extrusion20" plane through (-11.092548, -0.6, 25.654415) normal (0, 0, 1) x (1, 0, 0)
  line L0 (23.2, 3.216306) -> (24.7, 3.216306)
  line L1 (24.7, 3.216306) -> (24.7, 6.6)
  line L2 (24.7, 6.6) -> (23.2, 6.6)
  line L3 (23.2, 6.6) -> (23.2, 3.216306)
  line L4 (26.7, 2.7) -> (26.7, 6.6)
  line L5 (25.4, 2.7) -> (26.7, 2.7)
  line L6 (25.4, 6.6) -> (25.4, 2.7)
  line L7 (26.7, 6.6) -> (25.4, 6.6)
  line L8 (28.9, 6.6) -> (27.4, 6.6)
  line L9 (27.4, 6.6) -> (27.4, 3.157237)
  line L10 (27.4, 3.157237) -> (28.9, 3.157237)
  line L11 (28.9, 3.157237) -> (28.9, 6.6)
extrude "Extrusion20" add sketch "Sketch25 outline for Extrusion20" against normal blind 2.5
sketch "Sketch26" plane through (-11.092548, 6, 25.654415) normal (0, 0, 1) x (1, 0, 0)
  arc A0 (27.4, -2.238562) -> (28.9, -2.238562) centre (28.15, -2.9) ccw
  circle A1 centre (28.15, -2.9) radius 0.75
  arc A2 (23.2, -2.238562) -> (24.7, -2.238562) centre (23.95, -2.9) ccw
  circle A3 centre (23.95, -2.9) radius 0.75
  point P0 (11.092548, -6)
  dimension "d99" = 1.5
  dimension "d100" = 1.5
sketch "Sketch26 outline for Extrusion21" plane through (-11.092548, 6, 25.654415) normal (0, 0, 1) x (1, 0, 0)
  circle A0 centre (23.95, -2.9) radius 0.75
  circle A1 centre (28.15, -2.9) radius 0.75
extrude "Extrusion21" cut sketch "Sketch26 outline for Extrusion21" against normal blind 2.5
sketch "Sketch27" plane through (-11.092548, 6, 25.654415) normal (0, 0, 1) x (1, 0, 0)
  circle A0 centre (28.15, -2.9) radius 0.75
  circle A1 centre (28.15, -2.9) radius 1
  arc A2 (23.2, -2.238562) -> (24.7, -2.238562) centre (23.95, -2.9) ccw
  circle A3 centre (23.95, -2.9) radius 1
  point P0 (11.092548, -6)
sketch "Sketch27 outline for Extrusion22" plane through (-11.092548, 6, 25.654415) normal (0, 0, 1) x (1, 0, 0)
  circle A0 centre (23.95, -2.9) radius 1
  circle A1 centre (28.15, -2.9) radius 1
extrude "Extrusion22" cut sketch "Sketch27 outline for Extrusion22" against normal blind 0.1
sketch "Sketch28" plane through (-11.092548, 6, 25.654415) normal (0, 0, 1) x (1, 0, 0)
  line L0 (33.4, 0) -> (33.4, -6.6) projected
  line L1 (33.4, -6.6) -> (0, -6.6)
  line L2 (0, -6.6) -> (0, 0)
  line L3 (0, 0) -> (33.4, 0)
  line L4 (33.4, 0) -> (33.4, -6.6)
  point P0 (11.092548, -6)
sketch "Sketch28 outline for Extrusion23" plane through (-11.092548, 6, 25.654415) normal (0, 0, 1) x (1, 0, 0)
  line L0 (33.4, 0) -> (0, 0)
  line L1 (33.4, -6.6) -> (33.4, 0)
  line L2 (0, -6.6) -> (33.4, -6.6)
  line L3 (0, 0) -> (0, -6.6)
extrude "Extrusion23" add sketch "Sketch28 outline for Extrusion23" along normal blind 0.2
sketch "Sketch29" plane through (21.207452, 6, 23.154415) normal (0, 0, -1) x (-1, 0, 0)
  circle A0 centre (4.15, -2.9) radius 0.75 projected
  circle A1 centre (4.15, -2.9) radius 1
  circle A2 centre (8.35, -2.9) radius 0.75 projected
  circle A3 centre (8.35, -2.9) radius 1
  point P0 (21.207452, -6)
sketch "Sketch30" plane through (-11.092548, 6, 25.854415) normal (0, 0, 1) x (1, 0, 0)
  circle A0 centre (28.15, -2.9) radius 0.75 projected
  circle A1 centre (28.15, -2.9) radius 1
  circle A2 centre (23.95, -2.9) radius 0.75 projected
  circle A3 centre (23.95, -2.9) radius 1
  point P0 (11.092548, -6)
sketch "Sketch30 outline for Extrusion24" plane through (-11.092548, 6, 25.854415) normal (0, 0, 1) x (1, 0, 0)
  circle A0 centre (23.95, -2.9) radius 1
  circle A1 centre (23.95, -2.9) radius 0.75
  circle A2 centre (28.15, -2.9) radius 1
  circle A3 centre (28.15, -2.9) radius 0.75
extrude "Extrusion24" cut sketch "Sketch30 outline for Extrusion24" against normal blind 0.2
sketch "Sketch29 outline for Extrusion25" plane through (21.207452, 6, 23.154415) normal (0, 0, -1) x (-1, 0, 0)
  circle A0 centre (4.15, -2.9) radius 0.75
  circle A1 centre (8.35, -2.9) radius 0.75
extrude "Extrusion25" cut sketch "Sketch29 outline for Extrusion25" along normal up to surface (39.8 mm away)
sketch "Sketch31" plane through (-11.092548, 6, 25.854415) normal (0, 0, 1) x (1, 0, 0)
  circle A0 centre (28.15, -2.9) radius 0.75 projected
  circle A1 centre (28.15, -2.9) radius 0.75
  circle A2 centre (23.95, -2.9) radius 0.75 projected
  circle A3 centre (23.95, -2.9) radius 0.75
  point P0 (11.092548, -6)
sketch "Sketch31 outline for Extrusion26" plane through (-11.092548, 6, 25.854415) normal (0, 0, 1) x (1, 0, 0)
  circle A0 centre (23.95, -2.9) radius 0.75
  circle A1 centre (28.15, -2.9) radius 0.75
extrude "Extrusion26" cut sketch "Sketch31 outline for Extrusion26" against normal blind 3
sketch "Sketch32" plane through (0, 6, 0) normal (0, 1, 0) x (1, 0, 0)
  line L0 (15.96333, -24.407005) -> (18.616219, -24.407005)
  line L1 (18.616219, -24.407005) -> (18.616219, -25.008921)
  line L2 (18.616219, -25.008921) -> (15.96333, -25.008921)
  line L3 (15.96333, -25.008921) -> (15.96333, -24.407005)
  point P0 (0, 0)
sketch "Sketch32 outline for Extrusion27" plane through (0, 6, 0) normal (0, 1, 0) x (1, 0, 0)
  line L0 (15.96333, -24.407005) -> (15.96333, -25.008921)
  line L1 (18.616219, -24.407005) -> (15.96333, -24.407005)
  line L2 (18.616219, -25.008921) -> (18.616219, -24.407005)
  line L3 (15.96333, -25.008921) -> (18.616219, -25.008921)
extrude "Extrusion27" add sketch "Sketch32 outline for Extrusion27" against normal blind 1
sketch "Sketch33" plane through (0, 6, 0) normal (0, 1, 0) x (1, 0, 0)
  line L0 (22.307452, -25.854415) -> (-11.092548, -25.854415)
  line L1 (-11.092548, 17.745585) -> (-11.092548, -25.854415)
  line L2 (22.307452, -25.854415) -> (-11.092548, -25.854415)
  line L3 (-11.092548, -25.854415) -> (-11.092548, 17.745585)
  line L4 (-11.092548, 17.745585) -> (22.307452, 17.745585)
  line L5 (22.307452, 17.745585) -> (22.307452, -25.854415)
  line L6 (21.207452, 16.645585) -> (21.207452, -23.154415)
  line L7 (-9.992548, -23.154415) -> (-9.992548, 16.645585)
  line L8 (21.207452, -23.154415) -> (-9.992548, -23.154415)
  line L9 (-9.992548, -23.154415) -> (-9.992548, 16.645585)
  line L10 (-9.992548, 16.645585) -> (21.207452, 16.645585)
  line L11 (21.207452, 16.645585) -> (21.207452, -23.154415)
  point P0 (0, 0)
sketch "Sketch33 outline for Extrusion28" plane through (0, 6, 0) normal (0, 1, 0) x (1, 0, 0)
  line L0 (22.307452, -25.854415) -> (22.307452, 17.745585)
  line L1 (-11.092548, -25.854415) -> (22.307452, -25.854415)
  line L2 (22.307452, 17.745585) -> (-11.092548, 17.745585)
  line L3 (-11.092548, 17.745585) -> (-11.092548, -25.854415)
  line L4 (21.207452, -23.154415) -> (-9.992548, -23.154415)
  line L5 (21.207452, 16.645585) -> (21.207452, -23.154415)
  line L6 (-9.992548, 16.645585) -> (21.207452, 16.645585)
  line L7 (-9.992548, -23.154415) -> (-9.992548, 16.645585)
extrude "Extrusion28" add sketch "Sketch33 outline for Extrusion28" along normal blind 0.5
sketch "Sketch34" plane through (22.307452, -0.6, -17.745585) normal (0, 0, -1) x (-1, 0, 0)
  line L0 (1.1, 7.1) -> (32.3, 7.1) projected
  line L1 (7.7, 7.1) -> (25.7, 7.1)
  line L2 (25.7, 7.1) -> (25.7, 4.6)
  line L3 (25.7, 4.6) -> (7.7, 4.6)
  line L4 (7.7, 4.6) -> (7.7, 7.1)
  line L5 (0, 0) -> (0, 7.1) projected
  point P0 (22.307452, 0.6)
  point P1 (25.7, 7.1)
  dimension "d117" = 18
  dimension "d118" = 7.7
  dimension "d119" = 2.5
sketch "Sketch34 outline for Extrusion29" plane through (22.307452, -0.6, -17.745585) normal (0, 0, -1) x (-1, 0, 0)
  line L0 (7.7, 4.6) -> (25.7, 4.6)
  line L1 (7.7, 7.1) -> (7.7, 4.6)
  line L2 (25.7, 7.1) -> (7.7, 7.1)
  line L3 (25.7, 4.6) -> (25.7, 7.1)
extrude "Extrusion29" cut sketch "Sketch34 outline for Extrusion29" against normal blind 1.2
fillet "Fillet1" radius 2 2 edges at (-3.3925, 4, -17.1956) (14.6075, 4, -17.1956)
sketch "Sketch35" plane through (-11.092548, 6, 25.854415) normal (0, 0, 1) x (1, 0, 0)
  line L0 (0, -6.6) -> (33.4, -6.6)
  circle A0 centre (28.15, -2.9) radius 1
  line L1 (27.154579, -6.6) -> (29.15, -6.6)
  line L2 (29.15, -6.6) -> (29.15, -2.9)
  line L3 (29.15, -2.9) -> (27.154579, -2.9)
  line L4 (27.154579, -2.9) -> (27.154579, -6.6)
  circle A1 centre (23.95, -2.9) radius 1
  line L5 (22.95, -2.9) -> (24.95, -2.9)
  line L6 (24.95, -2.9) -> (24.95, -6.6)
  line L7 (24.95, -6.6) -> (22.95, -6.6)
  line L8 (22.95, -6.6) -> (22.95, -2.9)
  point P0 (11.092548, -6)
  point P1 (27.154579, -2.995585)
sketch "Sketch35 outline for Extrusion30" plane through (-11.092548, 6, 25.854415) normal (0, 0, 1) x (1, 0, 0)
  line L0 (27.154579, -2.995585) -> (27.154579, -6.6)
  arc A0 (29.15, -2.9) -> (27.154579, -2.995585) centre (28.15, -2.9) cw
  line L1 (29.15, -6.6) -> (29.15, -2.9)
  line L2 (27.154579, -6.6) -> (29.15, -6.6)
  line L3 (22.95, -2.9) -> (22.95, -6.6)
  arc A1 (24.95, -2.9) -> (22.95, -2.9) centre (23.95, -2.9) cw
  line L4 (24.95, -6.6) -> (24.95, -2.9)
  line L5 (22.95, -6.6) -> (24.95, -6.6)
extrude "Extrusion30" cut sketch "Sketch35 outline for Extrusion30" against normal blind 0.3
sketch "Sketch36" plane through (0, 6.5, 0) normal (0, 1, 0) x (1, 0, 0)
  point P0 (0, 0)
sketch "Sketch37" plane through (0, 6.5, 0) normal (0, 1, 0) x (1, 0, 0)
  point P0 (0, 0)
sketch "Sketch38" plane through (-11.092548, 6, 25.854415) normal (0, 0, 1) x (1, 0, 0)
  circle A0 centre (28.15, -2.9) radius 0.75 projected
  circle A1 centre (28.15, -2.9) radius 1
  circle A2 centre (23.95, -2.9) radius 0.75 projected
  circle A3 centre (23.95, -2.9) radius 1
  point P0 (11.092548, -6)
  dimension "d125" = 2
sketch "Sketch38 outline for Extrusion31" plane through (-11.092548, 6, 25.854415) normal (0, 0, 1) x (1, 0, 0)
  circle A0 centre (23.95, -2.9) radius 1
  circle A1 centre (23.95, -2.9) radius 0.75
  circle A2 centre (28.15, -2.9) radius 1
  circle A3 centre (28.15, -2.9) radius 0.75
extrude "Extrusion31" cut sketch "Sketch38 outline for Extrusion31" against normal blind 0.6
properties part number "battery-holder-v2"
